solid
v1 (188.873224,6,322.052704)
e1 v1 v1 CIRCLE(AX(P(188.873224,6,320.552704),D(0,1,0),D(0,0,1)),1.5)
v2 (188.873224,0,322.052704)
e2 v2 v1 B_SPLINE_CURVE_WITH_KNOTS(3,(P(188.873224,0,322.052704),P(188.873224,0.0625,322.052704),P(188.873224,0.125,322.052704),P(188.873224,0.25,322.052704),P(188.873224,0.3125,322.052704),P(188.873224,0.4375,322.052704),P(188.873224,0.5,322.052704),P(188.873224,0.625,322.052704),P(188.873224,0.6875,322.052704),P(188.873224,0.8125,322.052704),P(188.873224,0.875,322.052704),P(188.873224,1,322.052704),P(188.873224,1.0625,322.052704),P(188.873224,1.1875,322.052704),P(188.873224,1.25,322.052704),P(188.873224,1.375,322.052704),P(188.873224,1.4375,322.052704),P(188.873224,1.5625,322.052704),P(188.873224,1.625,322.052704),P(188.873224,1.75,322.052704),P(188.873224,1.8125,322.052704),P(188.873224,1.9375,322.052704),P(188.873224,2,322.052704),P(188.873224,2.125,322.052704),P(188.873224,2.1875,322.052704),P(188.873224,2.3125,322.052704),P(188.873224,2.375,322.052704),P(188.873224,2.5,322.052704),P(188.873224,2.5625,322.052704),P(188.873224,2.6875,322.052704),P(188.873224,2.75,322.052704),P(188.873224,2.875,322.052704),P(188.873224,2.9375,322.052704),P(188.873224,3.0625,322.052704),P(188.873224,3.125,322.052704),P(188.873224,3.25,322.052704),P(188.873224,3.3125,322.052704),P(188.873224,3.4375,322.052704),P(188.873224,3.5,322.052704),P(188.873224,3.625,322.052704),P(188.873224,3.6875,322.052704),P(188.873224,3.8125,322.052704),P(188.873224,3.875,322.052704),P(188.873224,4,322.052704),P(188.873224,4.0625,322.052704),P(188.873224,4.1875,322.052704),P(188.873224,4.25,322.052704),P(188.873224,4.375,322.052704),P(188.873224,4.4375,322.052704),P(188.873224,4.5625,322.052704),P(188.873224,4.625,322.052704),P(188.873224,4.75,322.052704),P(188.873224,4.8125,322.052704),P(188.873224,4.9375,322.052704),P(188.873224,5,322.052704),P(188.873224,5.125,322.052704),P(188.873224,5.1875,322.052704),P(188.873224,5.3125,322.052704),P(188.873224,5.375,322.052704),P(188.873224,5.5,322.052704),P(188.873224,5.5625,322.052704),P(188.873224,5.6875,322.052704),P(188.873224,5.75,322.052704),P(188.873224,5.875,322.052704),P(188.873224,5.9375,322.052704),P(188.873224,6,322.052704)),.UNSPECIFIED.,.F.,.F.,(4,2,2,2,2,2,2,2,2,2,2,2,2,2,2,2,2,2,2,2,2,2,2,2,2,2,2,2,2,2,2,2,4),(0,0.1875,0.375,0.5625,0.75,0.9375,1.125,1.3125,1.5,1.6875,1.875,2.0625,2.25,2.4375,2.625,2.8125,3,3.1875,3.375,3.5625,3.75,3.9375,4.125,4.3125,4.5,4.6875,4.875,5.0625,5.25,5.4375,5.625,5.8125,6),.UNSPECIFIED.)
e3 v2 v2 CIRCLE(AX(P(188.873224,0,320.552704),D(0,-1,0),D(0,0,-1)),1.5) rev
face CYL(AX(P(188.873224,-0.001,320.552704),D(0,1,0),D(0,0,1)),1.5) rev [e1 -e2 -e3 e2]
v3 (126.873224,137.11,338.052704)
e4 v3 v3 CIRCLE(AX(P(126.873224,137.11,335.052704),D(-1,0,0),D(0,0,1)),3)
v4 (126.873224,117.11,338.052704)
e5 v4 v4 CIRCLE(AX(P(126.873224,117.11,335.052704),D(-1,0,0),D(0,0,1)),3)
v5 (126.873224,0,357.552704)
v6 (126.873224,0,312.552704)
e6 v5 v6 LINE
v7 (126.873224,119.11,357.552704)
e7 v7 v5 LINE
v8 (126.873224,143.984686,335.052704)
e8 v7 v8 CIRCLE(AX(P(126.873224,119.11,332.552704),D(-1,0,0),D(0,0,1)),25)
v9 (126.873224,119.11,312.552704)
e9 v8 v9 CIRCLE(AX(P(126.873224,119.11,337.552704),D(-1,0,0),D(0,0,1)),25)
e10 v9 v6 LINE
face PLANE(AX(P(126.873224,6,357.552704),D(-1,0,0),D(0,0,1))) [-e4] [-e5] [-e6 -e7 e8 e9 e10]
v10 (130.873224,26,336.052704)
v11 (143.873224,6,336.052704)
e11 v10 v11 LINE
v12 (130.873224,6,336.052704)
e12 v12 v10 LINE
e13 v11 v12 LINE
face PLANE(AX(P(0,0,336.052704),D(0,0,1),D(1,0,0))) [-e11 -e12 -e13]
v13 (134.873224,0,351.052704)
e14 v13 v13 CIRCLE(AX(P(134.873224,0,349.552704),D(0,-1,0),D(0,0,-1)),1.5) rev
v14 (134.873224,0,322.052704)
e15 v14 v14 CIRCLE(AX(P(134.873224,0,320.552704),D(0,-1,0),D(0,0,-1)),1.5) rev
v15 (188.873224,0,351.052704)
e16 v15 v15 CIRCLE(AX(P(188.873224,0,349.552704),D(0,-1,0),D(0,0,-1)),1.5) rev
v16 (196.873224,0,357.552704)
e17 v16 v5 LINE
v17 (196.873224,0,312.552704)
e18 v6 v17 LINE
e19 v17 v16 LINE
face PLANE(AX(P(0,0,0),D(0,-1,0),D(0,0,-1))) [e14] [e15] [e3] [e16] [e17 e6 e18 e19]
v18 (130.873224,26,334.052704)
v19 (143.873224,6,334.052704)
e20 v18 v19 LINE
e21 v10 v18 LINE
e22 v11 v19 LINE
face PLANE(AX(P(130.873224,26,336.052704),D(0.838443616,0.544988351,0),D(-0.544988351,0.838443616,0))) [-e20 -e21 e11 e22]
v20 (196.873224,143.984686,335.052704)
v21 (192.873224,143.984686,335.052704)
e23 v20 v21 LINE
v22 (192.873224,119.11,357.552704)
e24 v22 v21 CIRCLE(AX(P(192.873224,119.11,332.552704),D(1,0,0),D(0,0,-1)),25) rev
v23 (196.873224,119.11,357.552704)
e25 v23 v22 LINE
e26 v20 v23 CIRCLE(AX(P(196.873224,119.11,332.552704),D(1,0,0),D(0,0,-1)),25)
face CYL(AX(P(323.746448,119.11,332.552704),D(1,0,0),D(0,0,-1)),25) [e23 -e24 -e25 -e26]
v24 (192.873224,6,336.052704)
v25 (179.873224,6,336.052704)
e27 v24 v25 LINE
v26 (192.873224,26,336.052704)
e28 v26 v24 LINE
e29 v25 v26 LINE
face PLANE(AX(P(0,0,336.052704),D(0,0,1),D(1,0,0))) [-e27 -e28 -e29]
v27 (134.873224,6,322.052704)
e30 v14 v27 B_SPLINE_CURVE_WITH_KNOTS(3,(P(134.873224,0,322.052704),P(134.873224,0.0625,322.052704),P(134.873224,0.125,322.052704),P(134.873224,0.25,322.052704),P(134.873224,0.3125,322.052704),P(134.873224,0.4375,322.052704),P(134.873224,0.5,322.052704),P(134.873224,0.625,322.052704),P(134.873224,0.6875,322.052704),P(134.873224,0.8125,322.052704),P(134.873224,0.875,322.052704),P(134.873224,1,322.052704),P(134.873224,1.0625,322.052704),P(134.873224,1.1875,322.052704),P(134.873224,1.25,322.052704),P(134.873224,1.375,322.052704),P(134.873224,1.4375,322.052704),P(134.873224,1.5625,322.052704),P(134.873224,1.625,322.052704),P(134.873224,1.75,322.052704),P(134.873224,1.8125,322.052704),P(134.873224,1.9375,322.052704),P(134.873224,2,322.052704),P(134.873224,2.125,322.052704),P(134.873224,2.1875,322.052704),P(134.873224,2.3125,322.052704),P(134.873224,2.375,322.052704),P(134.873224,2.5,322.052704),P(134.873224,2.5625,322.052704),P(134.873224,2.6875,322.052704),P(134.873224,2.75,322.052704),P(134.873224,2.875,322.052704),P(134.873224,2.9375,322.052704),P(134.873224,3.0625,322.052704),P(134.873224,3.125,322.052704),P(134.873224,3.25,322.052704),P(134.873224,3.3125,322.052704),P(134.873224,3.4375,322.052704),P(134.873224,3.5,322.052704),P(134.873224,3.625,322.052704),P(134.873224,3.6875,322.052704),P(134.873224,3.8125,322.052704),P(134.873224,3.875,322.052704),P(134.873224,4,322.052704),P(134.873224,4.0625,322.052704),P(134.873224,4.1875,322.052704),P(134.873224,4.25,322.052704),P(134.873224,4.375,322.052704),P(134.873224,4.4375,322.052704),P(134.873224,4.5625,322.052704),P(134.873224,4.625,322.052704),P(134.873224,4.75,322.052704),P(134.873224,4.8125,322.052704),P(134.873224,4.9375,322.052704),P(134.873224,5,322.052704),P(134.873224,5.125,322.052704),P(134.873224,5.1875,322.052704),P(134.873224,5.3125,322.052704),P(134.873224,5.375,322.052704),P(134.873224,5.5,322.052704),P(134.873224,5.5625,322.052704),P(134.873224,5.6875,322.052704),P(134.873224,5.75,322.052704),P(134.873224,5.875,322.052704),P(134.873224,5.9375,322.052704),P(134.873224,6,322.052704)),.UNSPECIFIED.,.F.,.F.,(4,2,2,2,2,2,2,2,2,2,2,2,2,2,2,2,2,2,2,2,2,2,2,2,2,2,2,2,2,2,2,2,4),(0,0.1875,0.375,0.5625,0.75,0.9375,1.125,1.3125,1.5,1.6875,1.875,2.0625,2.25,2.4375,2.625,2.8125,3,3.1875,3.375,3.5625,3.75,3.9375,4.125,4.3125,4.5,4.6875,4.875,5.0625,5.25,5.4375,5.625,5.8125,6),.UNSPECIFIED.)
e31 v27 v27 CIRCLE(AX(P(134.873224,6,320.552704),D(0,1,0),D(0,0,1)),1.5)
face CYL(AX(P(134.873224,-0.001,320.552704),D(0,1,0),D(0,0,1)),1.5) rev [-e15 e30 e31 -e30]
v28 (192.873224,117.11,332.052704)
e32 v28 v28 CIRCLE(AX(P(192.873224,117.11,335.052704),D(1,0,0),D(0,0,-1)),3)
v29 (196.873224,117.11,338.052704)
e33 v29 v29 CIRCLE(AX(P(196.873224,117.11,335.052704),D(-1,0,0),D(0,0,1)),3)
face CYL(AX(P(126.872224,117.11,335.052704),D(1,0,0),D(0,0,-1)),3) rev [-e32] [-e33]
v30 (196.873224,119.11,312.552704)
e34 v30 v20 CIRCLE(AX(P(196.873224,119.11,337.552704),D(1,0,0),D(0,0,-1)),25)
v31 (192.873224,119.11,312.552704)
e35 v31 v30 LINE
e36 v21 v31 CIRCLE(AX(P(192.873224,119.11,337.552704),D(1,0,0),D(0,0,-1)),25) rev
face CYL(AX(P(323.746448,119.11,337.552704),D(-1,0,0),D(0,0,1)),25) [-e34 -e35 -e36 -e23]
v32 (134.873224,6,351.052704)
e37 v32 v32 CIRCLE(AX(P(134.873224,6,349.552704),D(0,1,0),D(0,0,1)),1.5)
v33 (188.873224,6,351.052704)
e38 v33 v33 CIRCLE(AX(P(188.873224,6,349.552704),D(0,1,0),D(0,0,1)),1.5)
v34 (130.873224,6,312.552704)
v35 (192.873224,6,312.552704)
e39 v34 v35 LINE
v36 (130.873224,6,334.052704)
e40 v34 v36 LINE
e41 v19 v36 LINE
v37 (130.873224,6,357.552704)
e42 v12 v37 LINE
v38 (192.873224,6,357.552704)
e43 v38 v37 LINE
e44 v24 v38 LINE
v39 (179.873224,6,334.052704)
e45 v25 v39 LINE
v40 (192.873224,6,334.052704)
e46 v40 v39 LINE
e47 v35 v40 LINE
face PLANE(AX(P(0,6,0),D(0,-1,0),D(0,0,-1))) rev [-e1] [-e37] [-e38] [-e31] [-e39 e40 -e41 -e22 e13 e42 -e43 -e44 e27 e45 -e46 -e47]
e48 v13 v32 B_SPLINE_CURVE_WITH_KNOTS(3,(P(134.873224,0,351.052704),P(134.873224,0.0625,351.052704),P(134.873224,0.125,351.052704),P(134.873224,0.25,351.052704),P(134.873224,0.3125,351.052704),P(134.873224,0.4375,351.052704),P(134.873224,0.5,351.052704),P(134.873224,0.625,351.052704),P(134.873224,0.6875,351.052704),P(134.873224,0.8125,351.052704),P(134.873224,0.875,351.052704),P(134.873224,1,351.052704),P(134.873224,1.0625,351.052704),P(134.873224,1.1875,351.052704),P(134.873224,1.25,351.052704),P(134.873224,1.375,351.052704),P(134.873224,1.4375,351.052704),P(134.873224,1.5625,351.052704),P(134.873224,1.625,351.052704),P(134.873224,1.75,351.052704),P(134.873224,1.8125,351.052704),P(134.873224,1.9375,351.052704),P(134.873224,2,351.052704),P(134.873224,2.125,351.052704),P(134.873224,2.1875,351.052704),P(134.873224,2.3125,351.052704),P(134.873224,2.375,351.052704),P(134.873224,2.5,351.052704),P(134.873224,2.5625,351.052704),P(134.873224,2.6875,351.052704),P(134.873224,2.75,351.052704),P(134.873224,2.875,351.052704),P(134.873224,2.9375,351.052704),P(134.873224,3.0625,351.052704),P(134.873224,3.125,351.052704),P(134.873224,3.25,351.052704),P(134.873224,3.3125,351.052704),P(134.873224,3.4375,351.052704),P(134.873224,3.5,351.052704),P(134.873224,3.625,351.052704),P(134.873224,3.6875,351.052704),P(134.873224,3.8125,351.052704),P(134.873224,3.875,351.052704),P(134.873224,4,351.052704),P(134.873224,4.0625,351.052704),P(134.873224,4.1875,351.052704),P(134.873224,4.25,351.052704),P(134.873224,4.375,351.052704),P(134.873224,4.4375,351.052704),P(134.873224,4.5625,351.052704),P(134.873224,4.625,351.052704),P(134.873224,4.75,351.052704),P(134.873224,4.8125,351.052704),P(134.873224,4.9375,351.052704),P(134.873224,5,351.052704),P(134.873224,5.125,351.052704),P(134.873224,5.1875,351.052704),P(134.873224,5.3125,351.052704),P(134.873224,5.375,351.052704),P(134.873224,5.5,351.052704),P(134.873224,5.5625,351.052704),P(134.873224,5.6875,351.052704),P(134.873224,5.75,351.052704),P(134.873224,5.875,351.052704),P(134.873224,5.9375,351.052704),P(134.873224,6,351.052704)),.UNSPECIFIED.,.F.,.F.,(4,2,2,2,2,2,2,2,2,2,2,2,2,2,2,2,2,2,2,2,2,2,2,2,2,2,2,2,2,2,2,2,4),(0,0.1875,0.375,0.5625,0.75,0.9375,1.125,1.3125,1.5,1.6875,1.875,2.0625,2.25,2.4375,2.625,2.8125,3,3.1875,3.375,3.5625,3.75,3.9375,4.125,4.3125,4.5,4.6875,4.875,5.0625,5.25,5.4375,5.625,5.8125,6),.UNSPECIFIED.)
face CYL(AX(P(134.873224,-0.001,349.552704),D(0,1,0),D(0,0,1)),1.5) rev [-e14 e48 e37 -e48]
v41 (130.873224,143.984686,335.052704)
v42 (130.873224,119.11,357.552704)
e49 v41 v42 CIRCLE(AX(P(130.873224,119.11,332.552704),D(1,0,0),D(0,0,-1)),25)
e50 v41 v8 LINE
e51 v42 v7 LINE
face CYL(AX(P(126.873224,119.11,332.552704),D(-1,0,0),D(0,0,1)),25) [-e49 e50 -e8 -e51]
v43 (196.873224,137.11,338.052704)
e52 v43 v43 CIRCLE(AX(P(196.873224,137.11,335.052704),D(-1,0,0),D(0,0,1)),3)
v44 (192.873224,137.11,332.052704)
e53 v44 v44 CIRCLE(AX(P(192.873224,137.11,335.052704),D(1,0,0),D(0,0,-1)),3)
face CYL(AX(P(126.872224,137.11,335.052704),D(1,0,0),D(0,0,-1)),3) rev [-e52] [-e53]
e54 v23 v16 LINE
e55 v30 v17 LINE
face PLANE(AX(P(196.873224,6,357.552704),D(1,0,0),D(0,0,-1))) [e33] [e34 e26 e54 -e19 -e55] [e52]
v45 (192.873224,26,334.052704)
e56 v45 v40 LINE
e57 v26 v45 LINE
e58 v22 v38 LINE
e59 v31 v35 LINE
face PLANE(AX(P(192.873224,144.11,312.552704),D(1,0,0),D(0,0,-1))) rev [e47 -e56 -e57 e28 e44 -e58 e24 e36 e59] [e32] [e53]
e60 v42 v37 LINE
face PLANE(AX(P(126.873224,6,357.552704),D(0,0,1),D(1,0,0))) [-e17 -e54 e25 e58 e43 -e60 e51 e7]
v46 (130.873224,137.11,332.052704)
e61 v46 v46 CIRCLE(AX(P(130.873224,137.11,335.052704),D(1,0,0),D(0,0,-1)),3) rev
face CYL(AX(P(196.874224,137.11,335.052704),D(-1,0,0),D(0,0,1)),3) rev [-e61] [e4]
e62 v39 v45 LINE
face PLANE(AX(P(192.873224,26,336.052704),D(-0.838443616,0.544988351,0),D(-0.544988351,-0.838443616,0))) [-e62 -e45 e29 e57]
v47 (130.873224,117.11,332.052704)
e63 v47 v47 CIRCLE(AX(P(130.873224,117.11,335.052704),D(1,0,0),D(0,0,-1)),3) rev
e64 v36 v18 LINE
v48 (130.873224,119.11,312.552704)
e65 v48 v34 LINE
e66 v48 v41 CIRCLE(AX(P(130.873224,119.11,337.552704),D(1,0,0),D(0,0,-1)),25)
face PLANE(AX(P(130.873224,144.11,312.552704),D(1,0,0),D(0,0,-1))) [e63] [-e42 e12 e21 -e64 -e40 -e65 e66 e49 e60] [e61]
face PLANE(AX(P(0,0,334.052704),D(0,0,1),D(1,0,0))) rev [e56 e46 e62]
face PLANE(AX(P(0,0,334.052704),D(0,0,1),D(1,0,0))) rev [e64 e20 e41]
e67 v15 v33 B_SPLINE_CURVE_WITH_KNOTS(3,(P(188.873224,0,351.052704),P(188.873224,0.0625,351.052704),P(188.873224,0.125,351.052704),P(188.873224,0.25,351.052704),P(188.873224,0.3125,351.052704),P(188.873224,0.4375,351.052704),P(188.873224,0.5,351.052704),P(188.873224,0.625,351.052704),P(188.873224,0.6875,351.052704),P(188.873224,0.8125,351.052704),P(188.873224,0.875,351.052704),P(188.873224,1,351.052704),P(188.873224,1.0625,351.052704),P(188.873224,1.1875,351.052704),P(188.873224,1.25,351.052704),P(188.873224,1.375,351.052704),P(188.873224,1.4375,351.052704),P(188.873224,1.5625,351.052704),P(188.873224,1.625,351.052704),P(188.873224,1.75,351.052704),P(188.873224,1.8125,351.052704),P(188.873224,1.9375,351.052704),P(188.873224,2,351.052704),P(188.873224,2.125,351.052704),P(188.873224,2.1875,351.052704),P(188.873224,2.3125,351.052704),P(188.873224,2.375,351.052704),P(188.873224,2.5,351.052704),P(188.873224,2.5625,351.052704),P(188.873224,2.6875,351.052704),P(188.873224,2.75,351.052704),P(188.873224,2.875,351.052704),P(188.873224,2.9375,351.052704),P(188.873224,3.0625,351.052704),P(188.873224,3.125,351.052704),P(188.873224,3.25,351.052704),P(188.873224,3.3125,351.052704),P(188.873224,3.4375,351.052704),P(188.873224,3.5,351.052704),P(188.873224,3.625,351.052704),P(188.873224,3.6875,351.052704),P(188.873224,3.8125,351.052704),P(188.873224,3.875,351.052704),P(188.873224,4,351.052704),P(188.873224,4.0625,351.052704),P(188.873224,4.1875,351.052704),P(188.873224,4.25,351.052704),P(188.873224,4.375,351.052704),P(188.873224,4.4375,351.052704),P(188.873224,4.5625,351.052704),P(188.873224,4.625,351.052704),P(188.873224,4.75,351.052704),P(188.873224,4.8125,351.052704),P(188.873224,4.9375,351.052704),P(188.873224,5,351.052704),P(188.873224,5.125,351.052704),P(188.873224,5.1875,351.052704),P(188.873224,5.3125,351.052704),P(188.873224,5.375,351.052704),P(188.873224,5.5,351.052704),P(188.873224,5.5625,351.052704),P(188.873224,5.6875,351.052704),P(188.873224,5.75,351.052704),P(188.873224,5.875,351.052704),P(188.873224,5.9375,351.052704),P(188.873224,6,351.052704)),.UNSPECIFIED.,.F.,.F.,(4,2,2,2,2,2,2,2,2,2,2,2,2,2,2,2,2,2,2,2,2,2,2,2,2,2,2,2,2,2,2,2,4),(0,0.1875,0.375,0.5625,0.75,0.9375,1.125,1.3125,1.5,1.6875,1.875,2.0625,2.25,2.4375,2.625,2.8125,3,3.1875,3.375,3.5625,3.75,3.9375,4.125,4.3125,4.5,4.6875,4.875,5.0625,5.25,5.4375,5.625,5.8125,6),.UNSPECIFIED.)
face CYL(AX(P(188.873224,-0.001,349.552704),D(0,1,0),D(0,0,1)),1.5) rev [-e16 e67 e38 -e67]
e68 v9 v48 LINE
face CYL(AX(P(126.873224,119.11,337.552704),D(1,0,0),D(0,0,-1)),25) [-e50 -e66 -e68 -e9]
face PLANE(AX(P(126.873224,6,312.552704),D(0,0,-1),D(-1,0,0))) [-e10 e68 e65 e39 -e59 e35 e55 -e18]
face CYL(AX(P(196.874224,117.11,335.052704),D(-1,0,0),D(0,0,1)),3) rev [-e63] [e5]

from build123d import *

# Parameters (mm, degrees)
SKETCH1_W                = 70
SKETCH1_H                = 45
BOSS_EXTRUDE1_DEPTH      = 6
CUT_EXTRUDE1_REACH       = 410.214
SKETCH4_R                = 1.5
SKETCH5_W                = 4
SKETCH5_H                = 45
BOSS_EXTRUDE2_DEPTH      = 138.11
CUT_EXTRUDE2_REACH       = 393.806
SKETCH6_R                = 3
FILLET1_R                = 25
BOSS_EXTRUDE3_DEPTH      = 1
BOSS_EXTRUDE3_DEPTH_BACK = 1


with BuildPart() as part:
    # Sketch1 → Boss-Extrude1 (new body)
    with BuildSketch(Plane(origin=(148.74203414, 0, 254.057769676), x_dir=(1, 0, 0), z_dir=(0, -1, 0))):
        with Locations((13.131189711, 80.994934751)):
            Rectangle(SKETCH1_W, SKETCH1_H)
    extrude(amount=-BOSS_EXTRUDE1_DEPTH)

    # Sketch4 → Cut-Extrude1 (cut, up to next)
    with BuildSketch(Plane(origin=(0, 6, 0), x_dir=(-1, 0, 0), z_dir=(0, 1, 0)), mode=Mode.PRIVATE) as cut_extrude1_sk1:
        with Locations(Location((-188.87322385, 320.552704426, 0), (0, 0, 90))):
            Circle(SKETCH4_R)
    cut_extrude1_tool1 = extrude(cut_extrude1_sk1.sketch, amount=-CUT_EXTRUDE1_REACH, mode=Mode.PRIVATE) & part.part
    # Sketch4 → Cut-Extrude1 (cut, up to next)
    with BuildSketch(Plane(origin=(0, 6, 0), x_dir=(-1, 0, 0), z_dir=(0, 1, 0)), mode=Mode.PRIVATE) as cut_extrude1_sk2:
        with Locations(Location((-188.87322385, 349.552704426, 0), (0, 0, 90))):
            Circle(SKETCH4_R)
    cut_extrude1_tool2 = extrude(cut_extrude1_sk2.sketch, amount=-CUT_EXTRUDE1_REACH, mode=Mode.PRIVATE) & part.part
    # Sketch4 → Cut-Extrude1 (cut, up to next)
    with BuildSketch(Plane(origin=(0, 6, 0), x_dir=(-1, 0, 0), z_dir=(0, 1, 0)), mode=Mode.PRIVATE) as cut_extrude1_sk3:
        with Locations(Location((-134.87322385, 320.552704426, 0), (0, 0, 90))):
            Circle(SKETCH4_R)
    cut_extrude1_tool3 = extrude(cut_extrude1_sk3.sketch, amount=-CUT_EXTRUDE1_REACH, mode=Mode.PRIVATE) & part.part
    # Sketch4 → Cut-Extrude1 (cut, up to next)
    with BuildSketch(Plane(origin=(0, 6, 0), x_dir=(-1, 0, 0), z_dir=(0, 1, 0)), mode=Mode.PRIVATE) as cut_extrude1_sk4:
        with Locations(Location((-134.87322385, 349.552704426, 0), (0, 0, 90))):
            Circle(SKETCH4_R)
    cut_extrude1_tool4 = extrude(cut_extrude1_sk4.sketch, amount=-CUT_EXTRUDE1_REACH, mode=Mode.PRIVATE) & part.part
    add(cut_extrude1_tool1.solids().sort_by_distance((188.873224, 6, 320.552704))[0], mode=Mode.SUBTRACT)
    add(cut_extrude1_tool2.solids().sort_by_distance((188.873224, 6, 349.552704))[0], mode=Mode.SUBTRACT)
    add(cut_extrude1_tool3.solids().sort_by_distance((134.873224, 6, 320.552704))[0], mode=Mode.SUBTRACT)
    add(cut_extrude1_tool4.solids().sort_by_distance((134.873224, 6, 349.552704))[0], mode=Mode.SUBTRACT)

    # Sketch5 → Boss-Extrude2 (add)
    with BuildSketch(Plane(origin=(0, 6, 0), x_dir=(-1, 0, 0), z_dir=(0, -1, 0))):
        with Locations((-128.87322385, -335.052704426)):
            Rectangle(SKETCH5_W, SKETCH5_H)
    boss_extrude2 = extrude(amount=-BOSS_EXTRUDE2_DEPTH)

    # Sketch6 → Cut-Extrude2 (cut, up to next)
    with BuildSketch(Plane.ZY.offset(-126.87322385), mode=Mode.PRIVATE) as cut_extrude2_sk1:
        with Locations((335.052704426, 137.11)):
            Circle(SKETCH6_R)
    cut_extrude2_tool1 = extrude(cut_extrude2_sk1.sketch, amount=-CUT_EXTRUDE2_REACH, mode=Mode.PRIVATE) & part.part
    # Sketch6 → Cut-Extrude2 (cut, up to next)
    with BuildSketch(Plane.ZY.offset(-126.87322385), mode=Mode.PRIVATE) as cut_extrude2_sk2:
        with Locations((335.052704426, 117.11)):
            Circle(SKETCH6_R)
    cut_extrude2_tool2 = extrude(cut_extrude2_sk2.sketch, amount=-CUT_EXTRUDE2_REACH, mode=Mode.PRIVATE) & part.part
    cut_extrude2_1 = cut_extrude2_tool1.solids().sort_by_distance((126.873224, 137.11, 335.052704))[0]
    add(cut_extrude2_1, mode=Mode.SUBTRACT)
    cut_extrude2_2 = cut_extrude2_tool2.solids().sort_by_distance((126.873224, 117.11, 335.052704))[0]
    add(cut_extrude2_2, mode=Mode.SUBTRACT)
    cut_extrude2 = cut_extrude2_1 + cut_extrude2_2  # Cut-Extrude2 as one shape, for the pattern or mirror that repeats it

    # Mirror1: Boss-Extrude2, Cut-Extrude2 across plane
    add(boss_extrude2.mirror(Plane(origin=(161.87322385, 0, 0), x_dir=(0, 0, 1), z_dir=(1, 0, 0))))
    add(cut_extrude2.mirror(Plane(origin=(161.87322385, 0, 0), x_dir=(0, 0, 1), z_dir=(1, 0, 0))), mode=Mode.SUBTRACT)

    # Fillet1
    # the kernel refuses this fillet: 25 mm, written as the material it takes off along each edge
    with BuildSketch(Plane(origin=(259.37322385, 144.11, 312.552704426), x_dir=(0, 0, 1), z_dir=(-1, 0, 0)), Plane(origin=(193.37322385, 144.11, 357.552704426), x_dir=(0, -1, 0), z_dir=(-1, 0, 0))) as fillet1_piece_1:
        with BuildLine():
            CenterArc((FILLET1_R, -FILLET1_R), FILLET1_R, 90, 90)
            Line((0, -FILLET1_R), (0, 0))
            Line((0, 0), (FILLET1_R, 0))
        make_face()
    extrude(amount=129, mode=Mode.SUBTRACT)
    with BuildSketch(Plane(origin=(130.37322385, 144.11, 357.552704426), x_dir=(0, -1, 0), z_dir=(1, 0, 0)), Plane(origin=(64.37322385, 144.11, 312.552704426), x_dir=(0, 0, 1), z_dir=(1, 0, 0))) as fillet1_piece_2:
        with BuildLine():
            CenterArc((FILLET1_R, FILLET1_R), FILLET1_R, 180, 90)
            Line((0, FILLET1_R), (0, 0))
            Line((0, 0), (FILLET1_R, 0))
        make_face()
    extrude(amount=129, mode=Mode.SUBTRACT)

    # Sketch8 → Boss-Extrude3 (add, two sides: drawn at the far end of the back side and taken through both)
    with BuildSketch(Plane(origin=(0, 0, 335.052704426), x_dir=(-1, 0, 0), z_dir=(0, 0, -1)).offset(-BOSS_EXTRUDE3_DEPTH_BACK)):
        Polygon((-192.87322385, 6), (-192.87322385, 26), (-179.87322385, 6), align=None)
        Polygon((-130.87322385, 26), (-143.87322385, 6), (-130.87322385, 6), align=None)
    extrude(amount=BOSS_EXTRUDE3_DEPTH + BOSS_EXTRUDE3_DEPTH_BACK)


solid = part.part
